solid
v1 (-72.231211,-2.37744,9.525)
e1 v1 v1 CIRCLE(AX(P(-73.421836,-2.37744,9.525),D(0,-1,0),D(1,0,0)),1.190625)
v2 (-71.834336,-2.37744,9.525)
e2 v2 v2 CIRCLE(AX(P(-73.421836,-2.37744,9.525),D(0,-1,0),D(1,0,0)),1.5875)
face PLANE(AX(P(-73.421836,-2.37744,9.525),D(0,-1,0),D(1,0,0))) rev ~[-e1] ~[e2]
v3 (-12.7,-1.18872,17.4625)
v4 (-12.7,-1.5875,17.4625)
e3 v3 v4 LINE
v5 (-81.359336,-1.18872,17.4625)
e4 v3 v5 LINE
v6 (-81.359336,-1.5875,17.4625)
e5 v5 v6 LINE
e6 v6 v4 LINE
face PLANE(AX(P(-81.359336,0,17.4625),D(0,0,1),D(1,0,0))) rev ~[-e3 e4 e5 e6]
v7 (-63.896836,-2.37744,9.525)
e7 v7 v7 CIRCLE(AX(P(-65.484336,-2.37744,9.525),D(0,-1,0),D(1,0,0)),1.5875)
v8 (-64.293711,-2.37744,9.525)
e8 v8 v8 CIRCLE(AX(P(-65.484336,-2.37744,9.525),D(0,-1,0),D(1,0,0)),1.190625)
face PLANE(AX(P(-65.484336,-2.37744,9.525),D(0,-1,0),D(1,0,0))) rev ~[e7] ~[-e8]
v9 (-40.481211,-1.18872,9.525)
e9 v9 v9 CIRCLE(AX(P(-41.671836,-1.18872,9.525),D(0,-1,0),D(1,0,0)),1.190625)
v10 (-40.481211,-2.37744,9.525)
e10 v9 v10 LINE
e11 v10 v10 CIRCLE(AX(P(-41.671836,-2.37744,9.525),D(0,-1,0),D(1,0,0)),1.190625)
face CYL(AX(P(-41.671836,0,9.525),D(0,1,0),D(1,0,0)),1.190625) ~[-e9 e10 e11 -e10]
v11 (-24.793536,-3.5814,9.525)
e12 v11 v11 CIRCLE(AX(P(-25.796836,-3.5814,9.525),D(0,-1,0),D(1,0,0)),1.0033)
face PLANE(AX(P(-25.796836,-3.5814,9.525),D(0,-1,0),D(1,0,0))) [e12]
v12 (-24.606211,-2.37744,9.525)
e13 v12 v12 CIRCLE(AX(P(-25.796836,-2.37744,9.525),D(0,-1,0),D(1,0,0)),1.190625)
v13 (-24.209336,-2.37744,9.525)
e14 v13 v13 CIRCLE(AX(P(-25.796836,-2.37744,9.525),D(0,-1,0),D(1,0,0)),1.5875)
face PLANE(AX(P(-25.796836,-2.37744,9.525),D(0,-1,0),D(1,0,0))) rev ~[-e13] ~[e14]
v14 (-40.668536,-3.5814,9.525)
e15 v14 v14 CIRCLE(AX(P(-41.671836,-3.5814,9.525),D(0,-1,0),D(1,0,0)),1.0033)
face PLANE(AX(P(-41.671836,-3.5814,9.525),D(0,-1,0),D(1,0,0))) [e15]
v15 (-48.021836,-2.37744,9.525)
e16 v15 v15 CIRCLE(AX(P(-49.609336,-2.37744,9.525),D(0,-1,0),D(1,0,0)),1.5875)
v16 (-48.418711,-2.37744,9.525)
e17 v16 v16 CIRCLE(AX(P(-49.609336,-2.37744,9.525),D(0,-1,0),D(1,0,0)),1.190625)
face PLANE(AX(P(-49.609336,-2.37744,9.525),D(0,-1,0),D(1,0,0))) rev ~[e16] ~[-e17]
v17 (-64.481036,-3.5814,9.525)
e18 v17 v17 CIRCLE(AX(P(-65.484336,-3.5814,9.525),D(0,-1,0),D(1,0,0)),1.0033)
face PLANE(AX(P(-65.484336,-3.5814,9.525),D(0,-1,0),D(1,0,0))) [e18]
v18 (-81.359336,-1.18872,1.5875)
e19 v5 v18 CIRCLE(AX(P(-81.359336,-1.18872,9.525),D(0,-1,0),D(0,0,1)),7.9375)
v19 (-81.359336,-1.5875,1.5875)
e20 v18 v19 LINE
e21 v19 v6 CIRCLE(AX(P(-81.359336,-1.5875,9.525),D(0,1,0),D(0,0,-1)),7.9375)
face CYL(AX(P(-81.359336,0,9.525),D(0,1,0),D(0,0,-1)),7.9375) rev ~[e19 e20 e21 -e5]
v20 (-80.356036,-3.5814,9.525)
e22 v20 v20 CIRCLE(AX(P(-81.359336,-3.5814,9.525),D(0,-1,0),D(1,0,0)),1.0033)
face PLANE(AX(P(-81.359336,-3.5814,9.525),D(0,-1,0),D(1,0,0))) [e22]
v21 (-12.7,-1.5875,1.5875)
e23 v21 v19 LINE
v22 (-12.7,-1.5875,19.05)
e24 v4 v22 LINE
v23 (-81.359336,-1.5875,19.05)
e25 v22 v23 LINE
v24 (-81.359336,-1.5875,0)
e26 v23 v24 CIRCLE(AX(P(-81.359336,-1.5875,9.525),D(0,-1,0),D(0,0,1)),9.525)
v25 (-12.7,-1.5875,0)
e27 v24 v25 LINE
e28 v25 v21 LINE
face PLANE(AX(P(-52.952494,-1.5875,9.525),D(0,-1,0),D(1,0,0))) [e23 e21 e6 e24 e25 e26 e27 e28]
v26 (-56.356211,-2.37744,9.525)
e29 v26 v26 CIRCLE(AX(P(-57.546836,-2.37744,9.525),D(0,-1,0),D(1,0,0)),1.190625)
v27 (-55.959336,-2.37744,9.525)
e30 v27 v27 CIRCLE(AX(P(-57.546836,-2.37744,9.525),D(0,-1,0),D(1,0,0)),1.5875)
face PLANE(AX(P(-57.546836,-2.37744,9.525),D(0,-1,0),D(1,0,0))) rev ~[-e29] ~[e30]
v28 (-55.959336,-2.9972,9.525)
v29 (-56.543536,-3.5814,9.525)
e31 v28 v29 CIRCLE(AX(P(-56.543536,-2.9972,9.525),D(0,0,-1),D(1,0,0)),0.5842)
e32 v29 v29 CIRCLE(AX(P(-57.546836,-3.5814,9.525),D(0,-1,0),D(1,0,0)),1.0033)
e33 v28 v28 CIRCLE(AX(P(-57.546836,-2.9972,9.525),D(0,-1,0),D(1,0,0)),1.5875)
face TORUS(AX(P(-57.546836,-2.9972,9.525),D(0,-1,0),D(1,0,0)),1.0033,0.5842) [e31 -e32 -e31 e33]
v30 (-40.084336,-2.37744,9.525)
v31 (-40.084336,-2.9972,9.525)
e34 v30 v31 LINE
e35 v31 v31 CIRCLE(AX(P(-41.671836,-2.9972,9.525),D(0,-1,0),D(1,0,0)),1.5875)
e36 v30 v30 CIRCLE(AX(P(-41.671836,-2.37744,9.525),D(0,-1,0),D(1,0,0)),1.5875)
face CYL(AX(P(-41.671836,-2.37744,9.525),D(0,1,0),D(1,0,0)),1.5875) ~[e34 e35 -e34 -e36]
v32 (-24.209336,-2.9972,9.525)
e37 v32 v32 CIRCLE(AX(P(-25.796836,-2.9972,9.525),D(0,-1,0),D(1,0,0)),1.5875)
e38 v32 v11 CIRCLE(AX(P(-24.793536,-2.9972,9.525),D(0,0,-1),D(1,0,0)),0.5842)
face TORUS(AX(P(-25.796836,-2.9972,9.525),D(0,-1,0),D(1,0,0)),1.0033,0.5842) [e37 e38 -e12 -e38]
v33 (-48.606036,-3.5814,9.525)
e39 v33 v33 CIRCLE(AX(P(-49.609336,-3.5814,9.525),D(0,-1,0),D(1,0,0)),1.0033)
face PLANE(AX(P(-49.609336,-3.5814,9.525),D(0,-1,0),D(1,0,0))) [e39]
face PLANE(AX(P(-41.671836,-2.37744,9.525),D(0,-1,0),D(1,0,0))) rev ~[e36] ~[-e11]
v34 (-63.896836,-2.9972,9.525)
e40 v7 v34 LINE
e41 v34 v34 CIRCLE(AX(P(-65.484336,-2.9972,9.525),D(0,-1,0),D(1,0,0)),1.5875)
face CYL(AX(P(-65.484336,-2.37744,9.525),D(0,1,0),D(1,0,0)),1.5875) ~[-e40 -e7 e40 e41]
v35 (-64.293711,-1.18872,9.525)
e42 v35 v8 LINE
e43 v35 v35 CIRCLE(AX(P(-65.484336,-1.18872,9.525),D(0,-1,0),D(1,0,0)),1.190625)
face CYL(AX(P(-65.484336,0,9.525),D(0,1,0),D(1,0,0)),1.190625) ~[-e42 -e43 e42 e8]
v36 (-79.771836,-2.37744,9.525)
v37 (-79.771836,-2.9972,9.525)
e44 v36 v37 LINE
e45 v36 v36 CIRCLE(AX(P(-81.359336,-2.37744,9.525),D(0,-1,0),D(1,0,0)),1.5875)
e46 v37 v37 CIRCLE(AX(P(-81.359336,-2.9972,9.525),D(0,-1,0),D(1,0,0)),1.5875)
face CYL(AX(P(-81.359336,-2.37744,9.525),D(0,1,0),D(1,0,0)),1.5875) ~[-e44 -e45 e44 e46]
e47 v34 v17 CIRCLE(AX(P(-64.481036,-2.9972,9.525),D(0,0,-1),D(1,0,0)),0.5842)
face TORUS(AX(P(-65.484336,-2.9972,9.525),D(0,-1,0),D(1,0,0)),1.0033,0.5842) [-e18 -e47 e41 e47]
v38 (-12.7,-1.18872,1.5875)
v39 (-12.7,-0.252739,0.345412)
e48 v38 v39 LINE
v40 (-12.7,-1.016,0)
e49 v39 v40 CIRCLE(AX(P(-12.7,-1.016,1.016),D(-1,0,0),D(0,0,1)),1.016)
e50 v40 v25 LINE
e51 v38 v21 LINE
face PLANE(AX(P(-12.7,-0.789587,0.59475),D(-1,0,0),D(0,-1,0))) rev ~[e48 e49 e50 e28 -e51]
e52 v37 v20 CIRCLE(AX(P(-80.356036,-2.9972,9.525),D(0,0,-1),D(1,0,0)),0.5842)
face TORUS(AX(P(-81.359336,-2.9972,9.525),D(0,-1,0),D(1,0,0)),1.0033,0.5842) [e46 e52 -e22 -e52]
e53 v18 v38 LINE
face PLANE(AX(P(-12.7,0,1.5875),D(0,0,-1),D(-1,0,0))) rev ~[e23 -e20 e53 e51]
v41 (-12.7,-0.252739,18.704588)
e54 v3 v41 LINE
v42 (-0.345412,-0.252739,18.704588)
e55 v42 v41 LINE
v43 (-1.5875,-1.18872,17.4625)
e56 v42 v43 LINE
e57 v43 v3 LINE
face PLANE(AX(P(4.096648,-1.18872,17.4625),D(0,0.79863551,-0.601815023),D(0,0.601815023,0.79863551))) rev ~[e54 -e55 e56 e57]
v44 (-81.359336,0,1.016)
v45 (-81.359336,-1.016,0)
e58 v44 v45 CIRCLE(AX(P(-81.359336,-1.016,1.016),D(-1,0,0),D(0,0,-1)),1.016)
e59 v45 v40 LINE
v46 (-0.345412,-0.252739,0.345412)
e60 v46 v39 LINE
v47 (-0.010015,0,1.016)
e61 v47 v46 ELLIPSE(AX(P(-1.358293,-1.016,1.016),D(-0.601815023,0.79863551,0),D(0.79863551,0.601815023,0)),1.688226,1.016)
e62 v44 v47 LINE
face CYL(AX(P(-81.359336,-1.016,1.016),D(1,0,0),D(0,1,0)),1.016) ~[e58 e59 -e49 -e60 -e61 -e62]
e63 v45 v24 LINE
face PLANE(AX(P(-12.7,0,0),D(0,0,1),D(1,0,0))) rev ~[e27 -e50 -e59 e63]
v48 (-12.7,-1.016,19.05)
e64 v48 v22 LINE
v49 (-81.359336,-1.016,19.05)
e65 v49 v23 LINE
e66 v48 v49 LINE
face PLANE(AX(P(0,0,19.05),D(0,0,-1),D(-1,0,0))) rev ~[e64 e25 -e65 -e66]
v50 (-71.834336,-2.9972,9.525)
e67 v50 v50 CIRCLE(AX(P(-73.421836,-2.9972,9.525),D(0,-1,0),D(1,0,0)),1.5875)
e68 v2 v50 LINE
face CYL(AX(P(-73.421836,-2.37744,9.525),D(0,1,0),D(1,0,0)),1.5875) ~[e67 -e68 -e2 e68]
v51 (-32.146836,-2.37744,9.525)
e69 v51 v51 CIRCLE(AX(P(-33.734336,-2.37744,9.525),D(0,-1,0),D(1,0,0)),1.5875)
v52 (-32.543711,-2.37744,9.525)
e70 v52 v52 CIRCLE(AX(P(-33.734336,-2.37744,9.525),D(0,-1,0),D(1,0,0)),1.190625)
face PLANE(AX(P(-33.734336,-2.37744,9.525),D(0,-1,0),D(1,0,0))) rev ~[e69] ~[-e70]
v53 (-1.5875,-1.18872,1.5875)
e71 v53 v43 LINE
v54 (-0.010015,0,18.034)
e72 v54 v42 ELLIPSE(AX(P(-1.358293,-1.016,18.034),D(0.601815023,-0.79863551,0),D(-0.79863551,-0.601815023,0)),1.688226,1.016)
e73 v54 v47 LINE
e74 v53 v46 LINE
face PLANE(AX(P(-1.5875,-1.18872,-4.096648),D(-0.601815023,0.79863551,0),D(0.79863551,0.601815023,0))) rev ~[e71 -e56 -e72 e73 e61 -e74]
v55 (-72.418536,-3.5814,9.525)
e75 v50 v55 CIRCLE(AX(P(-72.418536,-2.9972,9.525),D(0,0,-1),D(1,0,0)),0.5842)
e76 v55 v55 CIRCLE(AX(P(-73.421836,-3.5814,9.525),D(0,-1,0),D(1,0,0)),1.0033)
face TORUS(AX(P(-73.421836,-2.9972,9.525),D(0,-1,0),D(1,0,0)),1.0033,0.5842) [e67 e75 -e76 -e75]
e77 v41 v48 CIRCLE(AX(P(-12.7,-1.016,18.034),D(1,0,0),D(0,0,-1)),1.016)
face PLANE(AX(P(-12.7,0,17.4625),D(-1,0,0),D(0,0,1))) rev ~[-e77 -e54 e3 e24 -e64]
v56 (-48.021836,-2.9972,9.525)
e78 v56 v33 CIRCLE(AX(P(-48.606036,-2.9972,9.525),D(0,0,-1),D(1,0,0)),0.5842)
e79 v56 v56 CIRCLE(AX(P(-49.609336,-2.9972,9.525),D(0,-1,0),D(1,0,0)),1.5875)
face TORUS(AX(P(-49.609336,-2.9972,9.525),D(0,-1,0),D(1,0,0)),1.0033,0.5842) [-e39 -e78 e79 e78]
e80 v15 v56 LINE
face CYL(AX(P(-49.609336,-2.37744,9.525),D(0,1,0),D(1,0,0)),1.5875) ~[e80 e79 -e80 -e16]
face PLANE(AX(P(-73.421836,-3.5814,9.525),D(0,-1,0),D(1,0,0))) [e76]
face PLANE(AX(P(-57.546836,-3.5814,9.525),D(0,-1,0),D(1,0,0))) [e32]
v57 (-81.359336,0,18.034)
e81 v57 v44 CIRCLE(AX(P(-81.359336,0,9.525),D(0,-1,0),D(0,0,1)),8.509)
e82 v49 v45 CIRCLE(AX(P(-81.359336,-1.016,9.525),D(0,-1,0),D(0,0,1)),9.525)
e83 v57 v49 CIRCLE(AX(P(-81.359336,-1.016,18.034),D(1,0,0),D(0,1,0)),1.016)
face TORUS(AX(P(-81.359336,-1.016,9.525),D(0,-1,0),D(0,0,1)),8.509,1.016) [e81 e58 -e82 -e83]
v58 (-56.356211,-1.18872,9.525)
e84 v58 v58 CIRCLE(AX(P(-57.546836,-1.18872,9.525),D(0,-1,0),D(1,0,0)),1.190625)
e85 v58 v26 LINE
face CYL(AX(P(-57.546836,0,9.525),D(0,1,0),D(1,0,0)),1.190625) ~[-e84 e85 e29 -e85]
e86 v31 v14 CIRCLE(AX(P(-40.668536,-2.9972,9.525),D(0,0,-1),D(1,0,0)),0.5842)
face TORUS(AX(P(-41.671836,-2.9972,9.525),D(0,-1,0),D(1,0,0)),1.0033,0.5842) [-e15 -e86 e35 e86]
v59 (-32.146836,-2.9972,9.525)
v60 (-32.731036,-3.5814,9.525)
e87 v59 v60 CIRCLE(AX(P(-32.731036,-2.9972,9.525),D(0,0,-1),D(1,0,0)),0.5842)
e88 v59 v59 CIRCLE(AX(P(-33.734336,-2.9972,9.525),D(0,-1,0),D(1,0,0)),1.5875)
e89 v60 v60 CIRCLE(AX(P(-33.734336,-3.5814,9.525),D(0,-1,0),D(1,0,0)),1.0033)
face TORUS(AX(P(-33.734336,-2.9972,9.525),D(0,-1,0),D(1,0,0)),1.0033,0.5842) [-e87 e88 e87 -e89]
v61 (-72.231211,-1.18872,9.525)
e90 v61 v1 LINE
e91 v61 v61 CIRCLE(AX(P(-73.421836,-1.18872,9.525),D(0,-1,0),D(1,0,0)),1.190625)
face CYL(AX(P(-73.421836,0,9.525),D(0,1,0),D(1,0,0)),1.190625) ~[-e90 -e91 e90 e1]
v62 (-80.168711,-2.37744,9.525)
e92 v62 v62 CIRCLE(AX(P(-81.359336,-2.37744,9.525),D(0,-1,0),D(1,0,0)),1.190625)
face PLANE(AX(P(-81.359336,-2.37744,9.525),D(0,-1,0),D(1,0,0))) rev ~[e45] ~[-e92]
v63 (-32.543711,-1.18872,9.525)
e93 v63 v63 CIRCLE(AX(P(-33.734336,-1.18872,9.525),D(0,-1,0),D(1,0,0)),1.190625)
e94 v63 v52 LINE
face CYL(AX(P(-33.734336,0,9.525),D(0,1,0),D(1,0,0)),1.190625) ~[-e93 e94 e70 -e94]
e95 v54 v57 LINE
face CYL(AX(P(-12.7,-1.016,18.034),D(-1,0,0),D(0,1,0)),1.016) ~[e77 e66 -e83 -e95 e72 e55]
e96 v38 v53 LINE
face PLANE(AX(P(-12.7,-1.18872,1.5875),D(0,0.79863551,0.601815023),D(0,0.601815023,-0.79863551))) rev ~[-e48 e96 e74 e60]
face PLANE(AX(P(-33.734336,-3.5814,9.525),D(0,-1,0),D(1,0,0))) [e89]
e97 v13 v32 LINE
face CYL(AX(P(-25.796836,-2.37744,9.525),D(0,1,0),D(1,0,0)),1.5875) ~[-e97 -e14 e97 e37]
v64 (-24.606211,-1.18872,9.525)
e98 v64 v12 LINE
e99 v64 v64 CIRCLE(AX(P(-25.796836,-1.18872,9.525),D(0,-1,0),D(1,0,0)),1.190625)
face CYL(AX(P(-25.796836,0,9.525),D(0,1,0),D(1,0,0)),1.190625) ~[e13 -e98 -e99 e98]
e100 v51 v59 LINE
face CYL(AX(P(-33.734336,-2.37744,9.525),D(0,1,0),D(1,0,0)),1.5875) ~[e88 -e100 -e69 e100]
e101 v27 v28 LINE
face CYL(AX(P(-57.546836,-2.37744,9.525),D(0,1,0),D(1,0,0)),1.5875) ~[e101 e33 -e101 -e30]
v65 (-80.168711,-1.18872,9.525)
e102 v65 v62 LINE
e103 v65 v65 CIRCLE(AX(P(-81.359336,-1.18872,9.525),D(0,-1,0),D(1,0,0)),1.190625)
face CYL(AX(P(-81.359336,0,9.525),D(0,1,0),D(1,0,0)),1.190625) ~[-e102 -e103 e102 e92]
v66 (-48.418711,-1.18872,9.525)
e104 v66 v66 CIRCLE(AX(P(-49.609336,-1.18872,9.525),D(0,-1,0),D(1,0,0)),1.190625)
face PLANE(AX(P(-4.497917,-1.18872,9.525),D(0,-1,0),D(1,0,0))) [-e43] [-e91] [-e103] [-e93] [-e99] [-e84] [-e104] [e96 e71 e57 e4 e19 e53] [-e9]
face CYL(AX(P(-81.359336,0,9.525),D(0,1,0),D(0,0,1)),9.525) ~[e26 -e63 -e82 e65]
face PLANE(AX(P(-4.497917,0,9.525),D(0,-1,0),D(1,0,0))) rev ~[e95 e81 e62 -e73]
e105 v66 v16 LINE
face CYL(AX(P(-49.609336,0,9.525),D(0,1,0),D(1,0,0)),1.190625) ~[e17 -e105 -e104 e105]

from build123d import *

# Parameters (mm, degrees)
F1_DEPTH     = 1.5875
F0_R         = 1.5875
F0_R_2       = 1.190625
F2_DEPTH     = 1.18872
F3_DEPTH     = 1.18872
F4_T1_DEPTH  = 27.2432951274
F4_T6_DEPTH  = 16.7966475637
F4_T11_DEPTH = 16.7966475637
F5_DEPTH     = 3.5814
F6_START     = 2.37744
F6_DEPTH     = 1.20396
F7_R         = 0.5842
F8_R         = 1.016


# Not quite as in the source:
# - a fillet or chamfer that OpenCascade refuses, or shapes differently, is made with other operations: its cross-section is extruded or revolved along the edge and cut away or added


with BuildPart() as f1:
    # F0 (on Front) → F1 (new body)
    with BuildSketch(Plane.XZ):
        with BuildLine():
            Line((-81.3593362805, 0), (-12.7, 0))
            Line((-12.7, 0), (-12.7, 1.5875))
            Line((-12.7, 1.5875), (-81.3593362805, 1.5875))
            ThreePointArc((-81.3593362805, 1.5875), (-89.2968362805, 9.525), (-81.3593362805, 17.4625))
            Line((-81.3593362805, 17.4625), (-12.7, 17.4625))
            Line((-12.7, 17.4625), (-12.7, 19.05))
            Line((-12.7, 19.05), (-81.3593362805, 19.05))
            ThreePointArc((-81.3593362805, 19.05), (-90.8843362805, 9.525), (-81.3593362805, 0))
        make_face()
    extrude(amount=F1_DEPTH)

    # F0 (on Front) → F2 (join)
    with BuildSketch(Plane.XZ):
        with BuildLine():
            Line((-81.3593362805, 1.5875), (-12.7, 1.5875))
            Line((-12.7, 1.5875), (-1.5875, 1.5875))
            Line((-1.5875, 1.5875), (-1.5875, 17.4625))
            Line((-1.5875, 17.4625), (-12.7, 17.4625))
            Line((-12.7, 17.4625), (-81.3593362805, 17.4625))
            ThreePointArc((-81.3593362805, 17.4625), (-89.2968362805, 9.525), (-81.3593362805, 1.5875))
        make_face()
        with Locations((-81.3593362805, 9.525)):
            Circle(F0_R, mode=Mode.SUBTRACT)
        with Locations((-73.4218362805, 9.525)):
            Circle(F0_R, mode=Mode.SUBTRACT)
        with Locations((-65.4843362805, 9.525)):
            Circle(F0_R, mode=Mode.SUBTRACT)
        with Locations((-57.5468362805, 9.525)):
            Circle(F0_R, mode=Mode.SUBTRACT)
        with Locations((-49.6093362805, 9.525)):
            Circle(F0_R, mode=Mode.SUBTRACT)
        with Locations((-41.6718362805, 9.525)):
            Circle(F0_R, mode=Mode.SUBTRACT)
        with Locations((-33.7343362805, 9.525)):
            Circle(F0_R, mode=Mode.SUBTRACT)
        with Locations((-25.7968362805, 9.525)):
            Circle(F0_R, mode=Mode.SUBTRACT)
        with Locations((-81.3593362805, 9.525)):
            Circle(F0_R)
        with Locations((-81.3593362805, 9.525)):
            Circle(F0_R_2, mode=Mode.SUBTRACT)
        with Locations((-73.4218362805, 9.525)):
            Circle(F0_R)
        with Locations((-73.4218362805, 9.525)):
            Circle(F0_R_2, mode=Mode.SUBTRACT)
        with Locations((-65.4843362805, 9.525)):
            Circle(F0_R)
        with Locations((-65.4843362805, 9.525)):
            Circle(F0_R_2, mode=Mode.SUBTRACT)
        with Locations((-57.5468362805, 9.525)):
            Circle(F0_R)
        with Locations((-57.5468362805, 9.525)):
            Circle(F0_R_2, mode=Mode.SUBTRACT)
        with Locations((-49.6093362805, 9.525)):
            Circle(F0_R)
        with Locations((-49.6093362805, 9.525)):
            Circle(F0_R_2, mode=Mode.SUBTRACT)
        with Locations((-41.6718362805, 9.525)):
            Circle(F0_R)
        with Locations((-41.6718362805, 9.525)):
            Circle(F0_R_2, mode=Mode.SUBTRACT)
        with Locations((-33.7343362805, 9.525)):
            Circle(F0_R)
        with Locations((-33.7343362805, 9.525)):
            Circle(F0_R_2, mode=Mode.SUBTRACT)
        with Locations((-25.7968362805, 9.525)):
            Circle(F0_R)
        with Locations((-25.7968362805, 9.525)):
            Circle(F0_R_2, mode=Mode.SUBTRACT)
    extrude(amount=F2_DEPTH)

    # F0 (on Front) → F3 (join)
    with BuildSketch(Plane.XZ):
        Polygon((-12.7, 0), (0, 0), (0, 19.05), (-12.7, 19.05), (-12.7, 17.4625), (-1.5875, 17.4625), (-1.5875, 1.5875), (-12.7, 1.5875), align=None)
    extrude(amount=F3_DEPTH)

    # F4: chamfer of 1.5875 x 1.1962670545 on 3 edges, made by hand

    # F4_s2 → F4_t1 (cut)
    with BuildSketch(Plane.XY.offset(-4.0966475637)):
        Polygon((-1.5875, -1.18872), (0, 0.0075470545), (0, -1.18872), align=None)
    extrude(amount=F4_T1_DEPTH, mode=Mode.SUBTRACT)


with BuildPart() as f4_tool4:
    # F4_s5 → F4_t6 (new body)
    with BuildSketch(Plane.YZ.offset(4.0966475637)):
        Polygon((-1.18872, 17.4625), (0.0075470545, 19.05), (-1.18872, 19.05), align=None)
    extrude(amount=-F4_T6_DEPTH)

    split(bisect_by=Plane.XY.offset(17.4625), keep=Keep.TOP)


with BuildPart() as f1_1:
    add(f1.part)

    # F4_t3: cut F4_tool4
    add(f4_tool4.part, mode=Mode.SUBTRACT)


with BuildPart() as f4_tool9:
    # F4_s10 → F4_t11 (new body)
    with BuildSketch(Plane.YZ.offset(-12.7)):
        Polygon((-1.18872, 1.5875), (0.0075470545, 0), (-1.18872, 0), align=None)
    extrude(amount=F4_T11_DEPTH)

    split(bisect_by=Plane.XY.offset(1.5875), keep=Keep.BOTTOM)


with BuildPart() as f1_2:
    add(f1_1.part)

    # F4_t8: cut F4_tool9
    add(f4_tool9.part, mode=Mode.SUBTRACT)

    # F0 (on Front) → F5 (join)
    with BuildSketch(Plane.XZ):
        with Locations((-81.3593362805, 9.525)):
            Circle(F0_R_2)
        with Locations((-73.4218362805, 9.525)):
            Circle(F0_R_2)
        with Locations((-65.4843362805, 9.525)):
            Circle(F0_R_2)
        with Locations((-57.5468362805, 9.525)):
            Circle(F0_R_2)
        with Locations((-49.6093362805, 9.525)):
            Circle(F0_R_2)
        with Locations((-41.6718362805, 9.525)):
            Circle(F0_R_2)
        with Locations((-33.7343362805, 9.525)):
            Circle(F0_R_2)
        with Locations((-25.7968362805, 9.525)):
            Circle(F0_R_2)
    extrude(amount=F5_DEPTH)

    # F0 (on Front) → F6 (join)
    with BuildSketch(Plane.XZ.offset(F6_START)):
        with Locations((-81.3593362805, 9.525)):
            Circle(F0_R)
        with Locations((-81.3593362805, 9.525)):
            Circle(F0_R_2, mode=Mode.SUBTRACT)
        with Locations((-73.4218362805, 9.525)):
            Circle(F0_R)
        with Locations((-73.4218362805, 9.525)):
            Circle(F0_R_2, mode=Mode.SUBTRACT)
        with Locations((-65.4843362805, 9.525)):
            Circle(F0_R)
        with Locations((-65.4843362805, 9.525)):
            Circle(F0_R_2, mode=Mode.SUBTRACT)
        with Locations((-57.5468362805, 9.525)):
            Circle(F0_R)
        with Locations((-57.5468362805, 9.525)):
            Circle(F0_R_2, mode=Mode.SUBTRACT)
        with Locations((-49.6093362805, 9.525)):
            Circle(F0_R)
        with Locations((-49.6093362805, 9.525)):
            Circle(F0_R_2, mode=Mode.SUBTRACT)
        with Locations((-41.6718362805, 9.525)):
            Circle(F0_R)
        with Locations((-41.6718362805, 9.525)):
            Circle(F0_R_2, mode=Mode.SUBTRACT)
        with Locations((-33.7343362805, 9.525)):
            Circle(F0_R)
        with Locations((-33.7343362805, 9.525)):
            Circle(F0_R_2, mode=Mode.SUBTRACT)
        with Locations((-25.7968362805, 9.525)):
            Circle(F0_R)
        with Locations((-25.7968362805, 9.525)):
            Circle(F0_R_2, mode=Mode.SUBTRACT)
    extrude(amount=F6_DEPTH)

    # F7
    f7_edges = [f1_2.edges().sort_by_distance(p)[0] for p in [
        (-82.946836, -3.5814, 9.525),
        (-75.009336, -3.5814, 9.525),
        (-67.071836, -3.5814, 9.525),
        (-59.134336, -3.5814, 9.525),
        (-51.196836, -3.5814, 9.525),
        (-43.259336, -3.5814, 9.525),
        (-35.321836, -3.5814, 9.525),
        (-27.384336, -3.5814, 9.525),
    ]]
    fillet(f7_edges, radius=F7_R)

    # F8
    f8_edges = [f1_2.edges().sort_by_distance(p)[0] for p in [
        (-47.029668, 0, 0),
        (-90.884336, 0, 9.525),
        (-47.029668, 0, 19.05),
    ]]
    fillet(f8_edges, radius=F8_R)


solid = f1_2.part
